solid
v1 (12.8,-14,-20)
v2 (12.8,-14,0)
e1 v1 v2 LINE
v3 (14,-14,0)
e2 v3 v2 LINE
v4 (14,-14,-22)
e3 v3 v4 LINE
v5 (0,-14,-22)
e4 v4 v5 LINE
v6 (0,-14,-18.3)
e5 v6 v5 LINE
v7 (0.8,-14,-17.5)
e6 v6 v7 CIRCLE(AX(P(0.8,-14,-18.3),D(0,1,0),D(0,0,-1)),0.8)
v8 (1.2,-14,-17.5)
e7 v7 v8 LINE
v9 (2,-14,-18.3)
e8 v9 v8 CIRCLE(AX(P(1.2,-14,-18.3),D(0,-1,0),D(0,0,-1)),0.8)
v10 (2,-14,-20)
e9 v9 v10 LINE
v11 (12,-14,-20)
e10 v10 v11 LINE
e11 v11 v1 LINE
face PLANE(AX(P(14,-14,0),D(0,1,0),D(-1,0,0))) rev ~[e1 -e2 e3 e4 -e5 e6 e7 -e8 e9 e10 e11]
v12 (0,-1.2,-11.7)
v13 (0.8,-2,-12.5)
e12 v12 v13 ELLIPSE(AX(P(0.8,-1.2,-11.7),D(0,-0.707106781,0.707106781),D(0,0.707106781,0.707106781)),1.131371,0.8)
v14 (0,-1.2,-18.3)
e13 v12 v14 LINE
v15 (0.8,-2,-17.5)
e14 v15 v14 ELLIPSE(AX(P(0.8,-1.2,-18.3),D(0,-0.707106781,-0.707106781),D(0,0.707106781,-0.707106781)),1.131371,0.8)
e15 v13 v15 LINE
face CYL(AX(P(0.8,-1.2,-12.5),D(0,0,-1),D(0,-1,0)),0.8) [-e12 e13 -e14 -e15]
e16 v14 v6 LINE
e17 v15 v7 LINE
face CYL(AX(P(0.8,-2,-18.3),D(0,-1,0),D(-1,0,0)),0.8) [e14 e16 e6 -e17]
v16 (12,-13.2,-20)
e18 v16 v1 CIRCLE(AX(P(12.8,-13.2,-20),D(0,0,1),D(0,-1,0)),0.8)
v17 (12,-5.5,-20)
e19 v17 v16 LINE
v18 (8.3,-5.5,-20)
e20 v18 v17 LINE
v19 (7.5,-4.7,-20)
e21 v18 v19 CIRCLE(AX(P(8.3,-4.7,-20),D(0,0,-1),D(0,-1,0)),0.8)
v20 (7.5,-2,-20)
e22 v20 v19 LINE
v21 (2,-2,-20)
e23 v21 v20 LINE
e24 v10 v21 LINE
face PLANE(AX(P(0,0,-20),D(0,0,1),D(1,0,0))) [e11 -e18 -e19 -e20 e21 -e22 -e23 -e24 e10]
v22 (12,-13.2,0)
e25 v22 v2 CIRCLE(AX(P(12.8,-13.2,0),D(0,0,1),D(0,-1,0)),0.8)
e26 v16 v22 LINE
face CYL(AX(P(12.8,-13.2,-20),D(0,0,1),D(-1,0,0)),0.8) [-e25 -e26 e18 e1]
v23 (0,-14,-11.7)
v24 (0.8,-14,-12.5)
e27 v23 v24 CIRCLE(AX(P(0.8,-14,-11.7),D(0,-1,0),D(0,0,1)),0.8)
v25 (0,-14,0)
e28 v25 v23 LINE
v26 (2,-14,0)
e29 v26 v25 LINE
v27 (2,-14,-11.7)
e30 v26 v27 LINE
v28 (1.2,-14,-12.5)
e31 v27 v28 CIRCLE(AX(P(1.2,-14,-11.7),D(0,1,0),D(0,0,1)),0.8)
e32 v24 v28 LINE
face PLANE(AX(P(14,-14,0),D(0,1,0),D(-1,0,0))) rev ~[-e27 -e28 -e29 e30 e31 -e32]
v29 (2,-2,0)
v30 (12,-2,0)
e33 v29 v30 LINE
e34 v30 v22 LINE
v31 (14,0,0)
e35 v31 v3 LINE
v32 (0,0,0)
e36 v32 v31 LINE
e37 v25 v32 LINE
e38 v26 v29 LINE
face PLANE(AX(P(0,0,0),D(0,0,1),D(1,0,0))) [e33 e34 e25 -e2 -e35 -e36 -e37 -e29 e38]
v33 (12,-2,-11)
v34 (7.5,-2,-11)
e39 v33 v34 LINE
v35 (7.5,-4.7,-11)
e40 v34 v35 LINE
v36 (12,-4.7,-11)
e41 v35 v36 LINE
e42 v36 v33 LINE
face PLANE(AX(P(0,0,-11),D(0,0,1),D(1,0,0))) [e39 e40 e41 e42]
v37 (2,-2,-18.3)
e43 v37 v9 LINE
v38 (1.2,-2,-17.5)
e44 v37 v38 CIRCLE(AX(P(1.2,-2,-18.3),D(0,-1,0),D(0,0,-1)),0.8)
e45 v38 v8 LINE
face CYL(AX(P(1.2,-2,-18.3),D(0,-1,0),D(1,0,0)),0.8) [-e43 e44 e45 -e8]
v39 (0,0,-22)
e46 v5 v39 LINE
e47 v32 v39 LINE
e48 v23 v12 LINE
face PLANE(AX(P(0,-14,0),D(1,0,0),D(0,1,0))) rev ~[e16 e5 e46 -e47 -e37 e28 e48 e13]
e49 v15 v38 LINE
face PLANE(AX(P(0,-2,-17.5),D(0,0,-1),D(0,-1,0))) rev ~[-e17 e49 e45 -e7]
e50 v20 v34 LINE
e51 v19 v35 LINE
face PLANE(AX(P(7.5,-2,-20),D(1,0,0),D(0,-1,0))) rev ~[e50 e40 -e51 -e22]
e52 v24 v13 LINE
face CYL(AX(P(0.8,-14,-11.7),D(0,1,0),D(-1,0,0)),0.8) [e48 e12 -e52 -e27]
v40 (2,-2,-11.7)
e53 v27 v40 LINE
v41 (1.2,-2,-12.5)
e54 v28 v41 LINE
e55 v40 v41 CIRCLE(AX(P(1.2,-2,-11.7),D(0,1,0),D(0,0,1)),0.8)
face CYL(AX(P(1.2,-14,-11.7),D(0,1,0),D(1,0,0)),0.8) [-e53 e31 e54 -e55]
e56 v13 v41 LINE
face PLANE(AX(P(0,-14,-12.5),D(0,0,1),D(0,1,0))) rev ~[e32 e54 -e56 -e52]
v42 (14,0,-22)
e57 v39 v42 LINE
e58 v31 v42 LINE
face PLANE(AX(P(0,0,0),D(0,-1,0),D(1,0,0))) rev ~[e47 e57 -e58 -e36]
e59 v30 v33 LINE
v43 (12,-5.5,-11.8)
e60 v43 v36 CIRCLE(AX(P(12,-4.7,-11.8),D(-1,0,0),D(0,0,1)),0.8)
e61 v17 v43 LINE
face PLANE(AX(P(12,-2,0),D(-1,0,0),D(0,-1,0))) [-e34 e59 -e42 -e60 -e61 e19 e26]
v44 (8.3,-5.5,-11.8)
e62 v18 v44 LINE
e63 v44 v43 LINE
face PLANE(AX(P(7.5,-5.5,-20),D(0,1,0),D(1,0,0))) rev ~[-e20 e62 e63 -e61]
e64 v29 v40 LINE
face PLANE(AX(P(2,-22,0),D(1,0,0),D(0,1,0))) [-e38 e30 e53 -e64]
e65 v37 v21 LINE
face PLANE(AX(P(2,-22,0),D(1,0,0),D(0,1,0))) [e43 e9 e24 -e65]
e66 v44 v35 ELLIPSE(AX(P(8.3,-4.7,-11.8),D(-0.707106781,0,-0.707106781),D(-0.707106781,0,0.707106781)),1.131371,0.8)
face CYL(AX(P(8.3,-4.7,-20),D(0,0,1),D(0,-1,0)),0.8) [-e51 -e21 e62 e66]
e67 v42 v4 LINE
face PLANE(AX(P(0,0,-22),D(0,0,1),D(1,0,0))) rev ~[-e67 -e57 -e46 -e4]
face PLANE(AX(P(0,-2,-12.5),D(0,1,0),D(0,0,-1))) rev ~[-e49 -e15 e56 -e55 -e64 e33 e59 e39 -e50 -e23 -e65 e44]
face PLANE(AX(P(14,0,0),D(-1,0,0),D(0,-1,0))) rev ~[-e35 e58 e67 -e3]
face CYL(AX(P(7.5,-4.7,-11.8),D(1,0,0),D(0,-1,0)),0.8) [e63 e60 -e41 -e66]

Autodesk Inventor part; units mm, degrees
ref_plane "YZ Plane" through (0, 0, 0) normal (1, 0, 0) x (0, 1, 0)
ref_plane "XZ Plane" through (0, 0, 0) normal (0, 1, 0) x (-1, 0, 0)
ref_plane "XY Plane" through (0, 0, 0) normal (0, 0, 1) x (1, 0, 0)
sketch "Sketch1" plane through (0, 0, 0) normal (0, 0, 1) x (1, 0, 0)
  line L0 (0, 0) -> (14, 0)
  line L1 (14, 0) -> (14, -14)
  line L2 (14, -14) -> (0, -14)
  line L3 (0, -14) -> (0, 0)
  dimension "d0" = 14
  dimension "d1" = 14
extrude "Extrusion1" add sketch "Sketch1" against normal blind 22
sketch "Sketch2" plane through (0, 0, 0) normal (0, 0, 1) x (1, 0, 0)
  line L0 (2, -2) -> (12, -2)
  line L1 (12, -2) -> (12, -22)
  line L2 (12, -22) -> (2, -22)
  line L3 (2, -22) -> (2, -2)
  point P0 (0, 0)
  dimension "d4" = 10
  dimension "d5" = 20
extrude "Extrusion2" cut sketch "Sketch2" against normal blind 20
sketch "Sketch8" plane through (0, -14, 0) normal (-1, 0, 0) x (0, 0, 1)
  point P0 (0, 14)
sketch "Sketch9" plane through (0, -14, 0) normal (-1, 0, 0) x (0, 0, 1)
  point P0 (0, 14)
sketch "Sketch11" plane through (0, -14, 0) normal (-1, 0, 0) x (0, 0, 1)
  point P0 (0, 14)
sketch "Sketch14" plane through (0, -14, 0) normal (-1, 0, 0) x (0, 0, 1)
  point P0 (0, 14)
sketch "Sketch15" plane through (0, -14, 0) normal (-1, 0, 0) x (0, 0, 1)
  point P0 (0, 14)
sketch "Sketch16" plane through (0, -14, 0) normal (-1, 0, 0) x (0, 0, 1)
  line L0 (-12.5, 12) -> (-17.5, 12)
  line L1 (-17.5, 12) -> (-17.5, 0)
  line L2 (-17.5, 0) -> (-12.5, 0)
  line L3 (-12.5, 0) -> (-12.5, 12)
  point P0 (0, 14)
  dimension "d30" = 5
  dimension "d31" = 12
extrude "Extrusion10" cut sketch "Sketch16" against normal blind 2
sketch "Sketch17" plane through (0, 0, -20) normal (0, 0, 1) x (1, 0, 0)
  line L0 (12, -2) -> (7.5, -2)
  line L1 (7.5, -2) -> (7.5, -5.5)
  line L2 (7.5, -5.5) -> (12, -5.5)
  line L3 (12, -5.5) -> (12, -2)
  point P0 (0, 0)
  dimension "d34" = 4.5
  dimension "d35" = 3.5
extrude "Extrusion11" add sketch "Sketch17" along normal blind 9
fillet "Fillet1" radius 0.8 8 edges at (0, -8, -12.5) (2, -8, -12.5) (0, -2, -15) (0, -8, -17.5) (2, -8, -17.5) (12, -14, -10) (7.5, -5.5, -15.5) (9.75, -5.5, -11)
properties part number "housing_v09"
